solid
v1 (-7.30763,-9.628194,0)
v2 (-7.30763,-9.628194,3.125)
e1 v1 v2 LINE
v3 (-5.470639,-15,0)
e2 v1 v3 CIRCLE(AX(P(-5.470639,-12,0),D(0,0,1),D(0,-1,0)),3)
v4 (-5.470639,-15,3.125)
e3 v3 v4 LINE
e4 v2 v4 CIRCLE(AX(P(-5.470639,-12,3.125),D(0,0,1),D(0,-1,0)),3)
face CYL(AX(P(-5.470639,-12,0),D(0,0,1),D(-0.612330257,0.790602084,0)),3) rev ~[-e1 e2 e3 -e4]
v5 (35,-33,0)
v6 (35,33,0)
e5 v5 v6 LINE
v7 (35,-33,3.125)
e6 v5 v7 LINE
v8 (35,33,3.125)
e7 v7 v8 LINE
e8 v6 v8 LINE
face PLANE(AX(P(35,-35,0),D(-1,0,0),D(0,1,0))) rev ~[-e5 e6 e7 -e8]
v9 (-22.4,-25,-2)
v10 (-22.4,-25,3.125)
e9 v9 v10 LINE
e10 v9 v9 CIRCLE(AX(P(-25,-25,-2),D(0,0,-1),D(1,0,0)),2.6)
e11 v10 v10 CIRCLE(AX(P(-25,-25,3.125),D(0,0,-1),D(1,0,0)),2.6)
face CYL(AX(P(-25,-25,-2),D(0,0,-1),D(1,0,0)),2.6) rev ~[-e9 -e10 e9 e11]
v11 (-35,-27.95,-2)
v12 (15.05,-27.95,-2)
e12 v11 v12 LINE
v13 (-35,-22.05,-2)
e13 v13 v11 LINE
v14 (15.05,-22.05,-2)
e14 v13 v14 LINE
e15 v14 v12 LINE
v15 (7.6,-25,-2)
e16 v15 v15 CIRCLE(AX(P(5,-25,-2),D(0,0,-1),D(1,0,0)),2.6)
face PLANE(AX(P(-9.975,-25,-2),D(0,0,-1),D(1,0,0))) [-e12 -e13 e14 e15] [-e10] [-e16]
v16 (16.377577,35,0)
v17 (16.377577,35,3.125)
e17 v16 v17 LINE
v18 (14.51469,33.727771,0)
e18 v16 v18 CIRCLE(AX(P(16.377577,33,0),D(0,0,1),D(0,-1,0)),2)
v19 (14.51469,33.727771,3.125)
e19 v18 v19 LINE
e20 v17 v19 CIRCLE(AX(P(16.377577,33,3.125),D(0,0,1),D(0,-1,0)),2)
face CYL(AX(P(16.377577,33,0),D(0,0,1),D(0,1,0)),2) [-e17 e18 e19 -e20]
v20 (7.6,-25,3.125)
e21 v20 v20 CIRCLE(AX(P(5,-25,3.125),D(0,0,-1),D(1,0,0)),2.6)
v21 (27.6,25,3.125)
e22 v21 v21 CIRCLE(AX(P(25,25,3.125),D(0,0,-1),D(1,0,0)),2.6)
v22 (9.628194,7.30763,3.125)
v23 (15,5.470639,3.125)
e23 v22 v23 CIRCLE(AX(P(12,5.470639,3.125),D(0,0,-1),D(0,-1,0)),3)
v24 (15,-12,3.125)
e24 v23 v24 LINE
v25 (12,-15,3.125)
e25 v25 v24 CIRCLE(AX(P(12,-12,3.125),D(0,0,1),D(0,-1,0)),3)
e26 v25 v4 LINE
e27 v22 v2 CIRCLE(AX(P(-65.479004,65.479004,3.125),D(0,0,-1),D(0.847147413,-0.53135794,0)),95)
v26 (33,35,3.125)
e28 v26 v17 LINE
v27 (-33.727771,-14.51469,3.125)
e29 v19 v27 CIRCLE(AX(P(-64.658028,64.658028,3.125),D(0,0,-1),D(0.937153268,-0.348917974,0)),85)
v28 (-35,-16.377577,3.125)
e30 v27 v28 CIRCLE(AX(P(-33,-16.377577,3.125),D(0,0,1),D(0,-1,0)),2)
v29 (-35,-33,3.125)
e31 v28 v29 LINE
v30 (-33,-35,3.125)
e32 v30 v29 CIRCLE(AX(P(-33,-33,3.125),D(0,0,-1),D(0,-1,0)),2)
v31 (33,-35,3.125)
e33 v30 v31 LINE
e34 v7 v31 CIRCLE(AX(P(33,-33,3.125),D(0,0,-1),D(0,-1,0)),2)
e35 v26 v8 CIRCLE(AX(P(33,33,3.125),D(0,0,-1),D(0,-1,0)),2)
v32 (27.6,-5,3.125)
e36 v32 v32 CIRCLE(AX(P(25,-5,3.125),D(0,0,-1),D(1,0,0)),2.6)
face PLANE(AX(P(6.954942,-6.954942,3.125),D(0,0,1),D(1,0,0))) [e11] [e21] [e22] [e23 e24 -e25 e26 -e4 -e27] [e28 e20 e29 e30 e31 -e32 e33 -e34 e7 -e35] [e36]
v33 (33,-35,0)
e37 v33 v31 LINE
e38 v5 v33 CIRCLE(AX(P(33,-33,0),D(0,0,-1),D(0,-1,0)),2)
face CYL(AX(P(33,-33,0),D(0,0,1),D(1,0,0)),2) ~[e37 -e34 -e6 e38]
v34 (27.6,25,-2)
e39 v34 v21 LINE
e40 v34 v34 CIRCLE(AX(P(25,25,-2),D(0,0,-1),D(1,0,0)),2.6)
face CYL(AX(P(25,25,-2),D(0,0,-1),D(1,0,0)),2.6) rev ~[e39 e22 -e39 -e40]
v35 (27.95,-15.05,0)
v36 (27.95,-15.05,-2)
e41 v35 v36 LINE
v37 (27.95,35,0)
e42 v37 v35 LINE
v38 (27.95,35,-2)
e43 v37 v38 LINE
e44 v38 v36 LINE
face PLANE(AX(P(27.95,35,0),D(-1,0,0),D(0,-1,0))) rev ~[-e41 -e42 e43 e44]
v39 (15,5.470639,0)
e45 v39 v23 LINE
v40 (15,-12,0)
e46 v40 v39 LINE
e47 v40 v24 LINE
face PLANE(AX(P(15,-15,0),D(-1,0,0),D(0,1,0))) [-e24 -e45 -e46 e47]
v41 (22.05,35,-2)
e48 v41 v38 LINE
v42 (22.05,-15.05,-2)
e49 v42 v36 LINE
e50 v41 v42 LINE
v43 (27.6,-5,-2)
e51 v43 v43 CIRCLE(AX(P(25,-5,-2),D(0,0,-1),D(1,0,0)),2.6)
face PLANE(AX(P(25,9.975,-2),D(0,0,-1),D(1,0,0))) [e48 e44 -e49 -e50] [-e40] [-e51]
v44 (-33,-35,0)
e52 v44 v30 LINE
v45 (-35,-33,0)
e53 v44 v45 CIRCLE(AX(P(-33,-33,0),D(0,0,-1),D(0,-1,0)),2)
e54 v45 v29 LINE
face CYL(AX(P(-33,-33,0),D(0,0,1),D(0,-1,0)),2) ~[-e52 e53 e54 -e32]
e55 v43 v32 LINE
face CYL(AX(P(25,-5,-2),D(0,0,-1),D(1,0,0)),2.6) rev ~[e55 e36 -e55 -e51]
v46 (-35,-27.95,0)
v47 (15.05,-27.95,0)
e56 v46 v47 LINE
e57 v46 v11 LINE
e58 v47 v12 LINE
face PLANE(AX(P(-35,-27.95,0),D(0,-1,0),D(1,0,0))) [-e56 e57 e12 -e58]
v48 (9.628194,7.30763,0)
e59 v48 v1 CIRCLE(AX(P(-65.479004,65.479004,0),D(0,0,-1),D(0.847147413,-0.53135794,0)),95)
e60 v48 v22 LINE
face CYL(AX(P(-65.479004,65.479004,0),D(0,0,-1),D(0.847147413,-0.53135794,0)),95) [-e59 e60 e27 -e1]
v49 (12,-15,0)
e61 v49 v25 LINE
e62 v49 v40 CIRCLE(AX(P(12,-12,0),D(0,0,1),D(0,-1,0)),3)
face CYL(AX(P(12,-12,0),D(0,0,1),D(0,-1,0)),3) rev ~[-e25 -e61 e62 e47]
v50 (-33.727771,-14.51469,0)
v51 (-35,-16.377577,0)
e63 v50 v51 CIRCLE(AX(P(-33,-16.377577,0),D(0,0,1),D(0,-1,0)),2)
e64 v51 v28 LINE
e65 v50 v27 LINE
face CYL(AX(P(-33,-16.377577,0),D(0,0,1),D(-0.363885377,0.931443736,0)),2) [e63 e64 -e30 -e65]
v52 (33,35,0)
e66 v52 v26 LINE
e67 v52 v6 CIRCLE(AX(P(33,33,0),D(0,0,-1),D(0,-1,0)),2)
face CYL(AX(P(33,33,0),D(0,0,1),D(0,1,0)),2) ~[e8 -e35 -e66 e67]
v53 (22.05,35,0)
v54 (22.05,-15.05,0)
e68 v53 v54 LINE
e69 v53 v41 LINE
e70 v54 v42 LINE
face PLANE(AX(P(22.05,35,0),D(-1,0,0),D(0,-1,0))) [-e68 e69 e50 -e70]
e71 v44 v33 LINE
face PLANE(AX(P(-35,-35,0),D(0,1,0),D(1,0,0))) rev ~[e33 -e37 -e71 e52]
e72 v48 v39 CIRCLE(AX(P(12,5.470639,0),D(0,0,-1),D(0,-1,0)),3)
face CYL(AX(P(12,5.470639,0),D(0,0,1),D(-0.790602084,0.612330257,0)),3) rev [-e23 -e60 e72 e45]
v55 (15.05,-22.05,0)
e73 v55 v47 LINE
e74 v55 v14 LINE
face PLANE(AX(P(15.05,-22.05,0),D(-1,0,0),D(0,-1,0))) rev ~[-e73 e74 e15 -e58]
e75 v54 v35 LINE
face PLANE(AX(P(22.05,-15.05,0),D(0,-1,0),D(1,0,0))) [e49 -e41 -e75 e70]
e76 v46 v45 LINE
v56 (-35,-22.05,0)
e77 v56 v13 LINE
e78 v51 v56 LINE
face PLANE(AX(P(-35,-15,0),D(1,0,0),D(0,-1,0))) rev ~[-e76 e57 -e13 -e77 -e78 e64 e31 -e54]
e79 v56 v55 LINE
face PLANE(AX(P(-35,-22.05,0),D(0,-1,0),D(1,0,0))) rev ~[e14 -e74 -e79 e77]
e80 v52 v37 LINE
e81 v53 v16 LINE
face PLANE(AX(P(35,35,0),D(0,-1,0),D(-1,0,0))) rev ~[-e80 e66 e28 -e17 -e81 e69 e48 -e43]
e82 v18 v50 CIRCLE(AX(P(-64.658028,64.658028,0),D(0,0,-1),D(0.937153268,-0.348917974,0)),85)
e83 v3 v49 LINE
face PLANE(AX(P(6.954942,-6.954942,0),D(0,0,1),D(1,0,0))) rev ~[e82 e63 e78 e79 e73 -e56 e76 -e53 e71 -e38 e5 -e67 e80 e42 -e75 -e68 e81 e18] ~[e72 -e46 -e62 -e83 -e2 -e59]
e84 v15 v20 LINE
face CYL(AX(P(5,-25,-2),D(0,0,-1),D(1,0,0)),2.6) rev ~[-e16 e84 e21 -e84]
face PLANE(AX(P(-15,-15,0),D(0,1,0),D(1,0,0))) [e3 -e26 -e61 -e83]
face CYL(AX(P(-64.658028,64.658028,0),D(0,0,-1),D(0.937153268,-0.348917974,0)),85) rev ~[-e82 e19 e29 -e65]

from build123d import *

# Parameters (mm, degrees)
F1_DEPTH = 3.125
F2_W     = 5.9
F2_H     = 50.05
F2_W_2   = 50.05
F2_H_2   = 5.9
F3_DEPTH = 2
F4_R     = 2.6
F5_DEPTH = 25
F6_R     = 2
F8_DEPTH = 25
F9_R     = 3


# Not quite as in the source:
# - a feature names something its author has since deleted; it is built from what else it names


with BuildPart() as f1:
    # F0 (on Top) → F1 (new body)
    with BuildSketch(Plane.XY):
        with BuildLine():
            Line((35, 35), (15, 35))
            ThreePointArc((15, 35), (-4.5539513718, 4.5539513718), (-35, -15))
            Line((-35, -15), (-35, -35))
            Line((-35, -35), (35, -35))
            Line((35, -35), (35, 35))
        make_face()
    extrude(amount=F1_DEPTH)

    # F2 (on face) → F3 (join)
    with BuildSketch(Plane(origin=(0, 0, 0), x_dir=(1, 0, 0), z_dir=(0, 0, -1))):
        with Locations((25, -9.975)):
            Rectangle(F2_W, F2_H)
        with Locations((-9.975, 25)):
            Rectangle(F2_W_2, F2_H_2)
    extrude(amount=F3_DEPTH)

    # F4 (on face) → F5 (cut)
    with BuildSketch(Plane(origin=(0, 0, -2), x_dir=(1, 0, 0), z_dir=(0, 0, -1))):
        with Locations((25, -25)):
            Circle(F4_R)
        with Locations((25, 5)):
            Circle(F4_R)
        with Locations((5, 25)):
            Circle(F4_R)
        with Locations((-25, 25)):
            Circle(F4_R)
    extrude(amount=-F5_DEPTH, mode=Mode.SUBTRACT)

    # F6
    f6_edges = [f1.edges().sort_by_distance(p)[0] for p in [
        (35, 35, 1.5625),
        (15, 35, 1.5625),
        (-35, -15, 1.5625),
        (-35, -35, 1.5625),
        (35, -35, 1.5625),
    ]]
    fillet(f6_edges, radius=F6_R)

    # F7 (on Top) → F8 (cut)
    with BuildSketch(Plane.XY):
        with BuildLine():
            Line((15, -15), (15, 15))
            ThreePointArc((15, 15), (1.6961399442, -1.6961399442), (-15, -15))
            Line((-15, -15), (15, -15))
        make_face()
    extrude(amount=F8_DEPTH, mode=Mode.SUBTRACT)

    # F9
    f9_edges = [f1.edges().sort_by_distance(p)[0] for p in [
        (15, 15, 1.5625),
        (15, -15, 1.5625),
        (-15, -15, 1.5625),
    ]]
    fillet(f9_edges, radius=F9_R)


solid = f1.part
